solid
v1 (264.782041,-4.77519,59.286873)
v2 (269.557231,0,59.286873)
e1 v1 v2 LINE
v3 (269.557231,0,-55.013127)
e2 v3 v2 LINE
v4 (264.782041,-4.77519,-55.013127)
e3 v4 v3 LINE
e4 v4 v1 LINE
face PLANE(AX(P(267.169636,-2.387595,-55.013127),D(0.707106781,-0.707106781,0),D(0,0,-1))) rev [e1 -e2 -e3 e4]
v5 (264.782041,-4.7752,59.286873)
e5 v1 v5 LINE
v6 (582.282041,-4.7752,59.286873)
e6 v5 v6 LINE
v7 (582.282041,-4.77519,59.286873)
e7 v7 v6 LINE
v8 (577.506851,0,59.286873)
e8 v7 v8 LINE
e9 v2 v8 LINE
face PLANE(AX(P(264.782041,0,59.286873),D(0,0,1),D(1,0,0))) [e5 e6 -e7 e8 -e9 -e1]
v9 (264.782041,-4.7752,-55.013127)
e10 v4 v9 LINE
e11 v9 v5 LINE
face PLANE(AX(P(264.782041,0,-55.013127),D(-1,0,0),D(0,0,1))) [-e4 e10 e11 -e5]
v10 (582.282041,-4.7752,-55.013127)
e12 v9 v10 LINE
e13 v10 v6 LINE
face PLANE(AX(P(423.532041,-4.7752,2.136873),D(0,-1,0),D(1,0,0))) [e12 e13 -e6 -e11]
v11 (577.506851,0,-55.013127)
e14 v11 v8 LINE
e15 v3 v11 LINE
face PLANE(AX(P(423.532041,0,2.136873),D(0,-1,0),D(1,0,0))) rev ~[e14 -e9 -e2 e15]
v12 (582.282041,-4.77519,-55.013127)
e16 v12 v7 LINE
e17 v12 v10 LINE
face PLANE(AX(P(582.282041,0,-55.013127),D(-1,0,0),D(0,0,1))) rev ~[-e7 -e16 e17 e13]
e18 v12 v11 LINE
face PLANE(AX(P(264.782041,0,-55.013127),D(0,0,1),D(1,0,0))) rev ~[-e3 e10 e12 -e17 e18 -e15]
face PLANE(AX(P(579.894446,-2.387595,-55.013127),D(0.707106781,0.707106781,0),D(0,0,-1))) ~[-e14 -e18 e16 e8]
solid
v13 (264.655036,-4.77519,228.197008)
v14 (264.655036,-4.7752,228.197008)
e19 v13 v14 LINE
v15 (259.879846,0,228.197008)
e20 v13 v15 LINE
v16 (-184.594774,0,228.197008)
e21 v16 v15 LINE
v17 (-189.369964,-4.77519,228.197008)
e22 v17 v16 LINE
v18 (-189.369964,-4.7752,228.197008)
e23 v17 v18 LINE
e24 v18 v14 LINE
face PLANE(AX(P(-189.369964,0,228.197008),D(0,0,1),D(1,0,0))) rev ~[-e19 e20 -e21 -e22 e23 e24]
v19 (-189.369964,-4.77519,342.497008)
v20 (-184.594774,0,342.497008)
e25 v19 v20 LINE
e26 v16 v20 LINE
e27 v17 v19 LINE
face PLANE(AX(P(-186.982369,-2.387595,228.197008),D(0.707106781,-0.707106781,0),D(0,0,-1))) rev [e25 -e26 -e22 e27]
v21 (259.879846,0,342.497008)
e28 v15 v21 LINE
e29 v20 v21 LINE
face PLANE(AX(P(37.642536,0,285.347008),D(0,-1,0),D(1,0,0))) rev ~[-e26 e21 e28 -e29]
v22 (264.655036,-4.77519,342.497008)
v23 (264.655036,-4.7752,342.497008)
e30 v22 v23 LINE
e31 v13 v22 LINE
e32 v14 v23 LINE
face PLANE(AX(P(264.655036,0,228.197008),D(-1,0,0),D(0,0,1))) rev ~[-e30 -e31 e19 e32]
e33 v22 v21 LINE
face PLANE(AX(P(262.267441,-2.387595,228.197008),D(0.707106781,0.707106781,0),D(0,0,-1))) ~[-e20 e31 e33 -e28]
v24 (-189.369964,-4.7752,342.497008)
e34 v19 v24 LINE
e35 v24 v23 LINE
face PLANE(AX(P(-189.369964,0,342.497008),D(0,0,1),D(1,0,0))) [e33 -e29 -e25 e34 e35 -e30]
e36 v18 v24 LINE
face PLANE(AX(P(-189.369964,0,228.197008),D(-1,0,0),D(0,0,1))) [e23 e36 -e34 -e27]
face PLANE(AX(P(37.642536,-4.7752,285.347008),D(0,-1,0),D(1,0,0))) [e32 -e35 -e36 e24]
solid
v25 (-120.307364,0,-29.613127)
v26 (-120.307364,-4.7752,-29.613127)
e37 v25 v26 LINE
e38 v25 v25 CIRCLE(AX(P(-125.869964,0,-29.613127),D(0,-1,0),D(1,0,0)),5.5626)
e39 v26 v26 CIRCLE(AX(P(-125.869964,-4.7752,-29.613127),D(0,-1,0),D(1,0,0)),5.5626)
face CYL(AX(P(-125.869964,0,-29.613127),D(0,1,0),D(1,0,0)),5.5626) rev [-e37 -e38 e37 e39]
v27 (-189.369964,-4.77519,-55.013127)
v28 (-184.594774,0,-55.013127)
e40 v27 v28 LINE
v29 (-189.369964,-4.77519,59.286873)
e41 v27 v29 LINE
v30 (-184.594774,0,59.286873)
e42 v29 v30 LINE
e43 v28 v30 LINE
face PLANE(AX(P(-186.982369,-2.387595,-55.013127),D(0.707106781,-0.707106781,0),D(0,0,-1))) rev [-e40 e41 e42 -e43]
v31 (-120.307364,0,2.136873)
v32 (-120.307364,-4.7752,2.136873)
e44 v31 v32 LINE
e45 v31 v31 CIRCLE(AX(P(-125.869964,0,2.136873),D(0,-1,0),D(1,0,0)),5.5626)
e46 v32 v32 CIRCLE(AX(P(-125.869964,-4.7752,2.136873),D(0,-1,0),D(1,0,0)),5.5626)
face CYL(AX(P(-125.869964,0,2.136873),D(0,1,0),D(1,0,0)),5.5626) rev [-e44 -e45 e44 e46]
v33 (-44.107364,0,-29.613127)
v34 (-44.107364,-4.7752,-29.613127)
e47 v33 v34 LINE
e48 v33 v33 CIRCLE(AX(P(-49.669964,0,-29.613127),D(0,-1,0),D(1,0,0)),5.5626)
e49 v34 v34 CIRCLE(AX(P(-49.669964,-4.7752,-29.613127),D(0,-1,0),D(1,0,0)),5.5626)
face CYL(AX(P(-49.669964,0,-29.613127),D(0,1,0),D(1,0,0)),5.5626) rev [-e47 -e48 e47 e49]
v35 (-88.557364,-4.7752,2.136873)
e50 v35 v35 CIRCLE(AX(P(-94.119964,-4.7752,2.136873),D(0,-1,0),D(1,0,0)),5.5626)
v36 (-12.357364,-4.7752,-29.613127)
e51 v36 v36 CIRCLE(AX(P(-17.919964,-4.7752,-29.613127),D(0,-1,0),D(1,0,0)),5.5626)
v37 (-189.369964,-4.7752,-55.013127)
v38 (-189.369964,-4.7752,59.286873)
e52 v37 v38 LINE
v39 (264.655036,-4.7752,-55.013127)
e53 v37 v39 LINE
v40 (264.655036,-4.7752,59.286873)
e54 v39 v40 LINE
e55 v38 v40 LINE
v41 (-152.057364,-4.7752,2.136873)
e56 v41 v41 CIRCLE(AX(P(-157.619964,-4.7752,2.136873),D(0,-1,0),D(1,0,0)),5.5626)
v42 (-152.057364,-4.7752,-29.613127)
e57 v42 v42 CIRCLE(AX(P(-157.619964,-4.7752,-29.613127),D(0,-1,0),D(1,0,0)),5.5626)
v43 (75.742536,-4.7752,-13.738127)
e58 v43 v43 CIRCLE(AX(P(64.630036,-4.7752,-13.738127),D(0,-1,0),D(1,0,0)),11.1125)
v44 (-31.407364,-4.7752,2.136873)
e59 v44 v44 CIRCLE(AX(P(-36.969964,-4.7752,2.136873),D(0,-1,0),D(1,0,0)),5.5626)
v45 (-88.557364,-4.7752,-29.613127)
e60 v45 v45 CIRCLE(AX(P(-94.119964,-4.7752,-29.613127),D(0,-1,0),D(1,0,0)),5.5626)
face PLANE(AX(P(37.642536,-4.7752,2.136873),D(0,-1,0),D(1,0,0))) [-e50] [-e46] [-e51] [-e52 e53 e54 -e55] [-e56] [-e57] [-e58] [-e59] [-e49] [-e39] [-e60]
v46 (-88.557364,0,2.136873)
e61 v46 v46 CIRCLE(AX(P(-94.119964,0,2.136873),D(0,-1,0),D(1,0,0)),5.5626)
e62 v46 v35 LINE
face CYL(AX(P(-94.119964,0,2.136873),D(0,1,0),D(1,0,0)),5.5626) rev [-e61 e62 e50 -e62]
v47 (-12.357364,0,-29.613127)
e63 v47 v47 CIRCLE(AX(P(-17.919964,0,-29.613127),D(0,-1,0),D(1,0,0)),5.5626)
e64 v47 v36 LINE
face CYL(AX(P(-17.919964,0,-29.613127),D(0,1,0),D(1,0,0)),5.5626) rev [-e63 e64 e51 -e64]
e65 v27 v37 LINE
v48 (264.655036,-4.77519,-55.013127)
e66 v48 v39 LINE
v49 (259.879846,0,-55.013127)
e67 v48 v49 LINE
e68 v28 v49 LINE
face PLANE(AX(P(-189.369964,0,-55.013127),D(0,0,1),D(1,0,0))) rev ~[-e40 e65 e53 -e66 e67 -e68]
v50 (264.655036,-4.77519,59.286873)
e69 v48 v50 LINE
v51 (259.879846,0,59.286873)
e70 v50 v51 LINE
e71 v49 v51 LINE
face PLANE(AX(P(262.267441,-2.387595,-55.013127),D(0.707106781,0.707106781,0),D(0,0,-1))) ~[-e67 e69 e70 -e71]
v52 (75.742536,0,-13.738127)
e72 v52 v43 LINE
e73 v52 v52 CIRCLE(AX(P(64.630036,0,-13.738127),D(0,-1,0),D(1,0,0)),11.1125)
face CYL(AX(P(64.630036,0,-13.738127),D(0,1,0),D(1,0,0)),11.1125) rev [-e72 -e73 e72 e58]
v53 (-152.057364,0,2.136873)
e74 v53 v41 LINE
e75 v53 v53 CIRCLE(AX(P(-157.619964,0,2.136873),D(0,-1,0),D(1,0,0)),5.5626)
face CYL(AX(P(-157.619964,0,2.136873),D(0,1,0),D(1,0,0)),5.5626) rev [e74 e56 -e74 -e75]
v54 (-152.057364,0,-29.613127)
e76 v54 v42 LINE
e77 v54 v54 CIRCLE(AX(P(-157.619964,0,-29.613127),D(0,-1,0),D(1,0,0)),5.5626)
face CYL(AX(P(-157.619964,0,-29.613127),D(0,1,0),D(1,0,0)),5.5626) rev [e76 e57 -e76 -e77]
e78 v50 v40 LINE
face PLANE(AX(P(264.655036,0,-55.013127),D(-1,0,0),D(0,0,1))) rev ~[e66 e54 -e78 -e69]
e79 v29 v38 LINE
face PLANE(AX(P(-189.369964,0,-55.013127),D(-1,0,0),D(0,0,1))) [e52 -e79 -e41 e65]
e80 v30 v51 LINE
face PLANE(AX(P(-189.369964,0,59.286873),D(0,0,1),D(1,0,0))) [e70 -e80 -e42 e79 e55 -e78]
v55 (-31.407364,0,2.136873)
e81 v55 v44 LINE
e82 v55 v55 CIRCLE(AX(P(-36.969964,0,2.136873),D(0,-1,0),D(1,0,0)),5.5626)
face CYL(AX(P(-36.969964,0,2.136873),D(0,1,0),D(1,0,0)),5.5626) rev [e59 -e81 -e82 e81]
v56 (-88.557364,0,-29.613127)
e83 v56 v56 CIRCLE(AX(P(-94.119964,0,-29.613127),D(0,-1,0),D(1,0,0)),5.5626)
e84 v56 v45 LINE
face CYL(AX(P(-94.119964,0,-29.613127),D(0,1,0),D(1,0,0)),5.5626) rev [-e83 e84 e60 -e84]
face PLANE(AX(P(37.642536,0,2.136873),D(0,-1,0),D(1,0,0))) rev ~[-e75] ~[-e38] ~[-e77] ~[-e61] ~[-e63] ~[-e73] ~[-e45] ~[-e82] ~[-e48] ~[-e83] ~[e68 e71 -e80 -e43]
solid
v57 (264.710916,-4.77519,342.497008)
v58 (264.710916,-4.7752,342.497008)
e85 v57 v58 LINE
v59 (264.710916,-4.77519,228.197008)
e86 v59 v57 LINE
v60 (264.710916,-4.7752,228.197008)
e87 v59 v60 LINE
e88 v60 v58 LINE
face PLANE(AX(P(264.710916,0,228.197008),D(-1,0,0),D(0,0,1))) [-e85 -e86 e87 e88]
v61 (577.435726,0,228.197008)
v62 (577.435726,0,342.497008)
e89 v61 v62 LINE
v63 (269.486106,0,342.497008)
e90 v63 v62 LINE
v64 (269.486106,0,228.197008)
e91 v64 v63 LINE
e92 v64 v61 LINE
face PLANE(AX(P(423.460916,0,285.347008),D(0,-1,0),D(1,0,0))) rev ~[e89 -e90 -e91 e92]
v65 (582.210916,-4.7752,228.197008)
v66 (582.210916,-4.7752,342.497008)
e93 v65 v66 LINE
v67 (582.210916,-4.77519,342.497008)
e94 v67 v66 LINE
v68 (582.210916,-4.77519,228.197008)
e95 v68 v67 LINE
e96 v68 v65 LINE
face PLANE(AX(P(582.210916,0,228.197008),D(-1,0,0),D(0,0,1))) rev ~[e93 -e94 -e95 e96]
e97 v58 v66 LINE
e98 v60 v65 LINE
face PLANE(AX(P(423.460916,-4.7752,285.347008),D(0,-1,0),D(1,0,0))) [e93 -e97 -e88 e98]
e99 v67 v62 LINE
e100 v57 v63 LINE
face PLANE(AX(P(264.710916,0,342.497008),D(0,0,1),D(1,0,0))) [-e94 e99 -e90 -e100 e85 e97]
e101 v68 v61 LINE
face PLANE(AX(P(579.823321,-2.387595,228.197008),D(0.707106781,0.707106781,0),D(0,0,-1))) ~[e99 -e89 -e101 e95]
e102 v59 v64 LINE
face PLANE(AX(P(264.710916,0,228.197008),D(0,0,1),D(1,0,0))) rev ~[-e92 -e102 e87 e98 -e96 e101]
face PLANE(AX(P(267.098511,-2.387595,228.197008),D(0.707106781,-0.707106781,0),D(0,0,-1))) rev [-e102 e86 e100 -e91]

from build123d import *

# Parameters (mm, degrees)
F0_W      = 454.025
F0_H      = 114.3
F0_R      = 5.5626
F0_R_2    = 11.1125
F1_DEPTH  = 4.7752
F0_W_2    = 317.5
F2_SIZE   = 4.77519
F2_2_SIZE = 4.77519
F2_3_SIZE = 4.77519
F2_4_SIZE = 4.77519


# Not quite as in the source:
# - a fillet or chamfer is up to 0.001 mm smaller than in the source, because OpenCascade refuses the exact size
# - a feature names something its author has since deleted; it is built from what else it names


with BuildPart() as f1:
    # F0 (on Front) → F1 (new body)
    with BuildSketch(Plane.XZ):
        with Locations((37.6425363503, 2.1368730813)):
            Rectangle(F0_W, F0_H)
        with Locations((-157.6199636497, -29.6131269187)):
            Circle(F0_R, mode=Mode.SUBTRACT)
        with Locations((-125.8699636497, -29.6131269187)):
            Circle(F0_R, mode=Mode.SUBTRACT)
        with Locations((-94.1199636497, -29.6131269187)):
            Circle(F0_R, mode=Mode.SUBTRACT)
        with Locations((-49.6699636497, -29.6131269187)):
            Circle(F0_R, mode=Mode.SUBTRACT)
        with Locations((-17.9199636497, -29.6131269187)):
            Circle(F0_R, mode=Mode.SUBTRACT)
        with Locations((-157.6199636497, 2.1368730813)):
            Circle(F0_R, mode=Mode.SUBTRACT)
        with Locations((-125.8699636497, 2.1368730813)):
            Circle(F0_R, mode=Mode.SUBTRACT)
        with Locations((-94.1199636497, 2.1368730813)):
            Circle(F0_R, mode=Mode.SUBTRACT)
        with Locations((-36.9699636497, 2.1368730813)):
            Circle(F0_R, mode=Mode.SUBTRACT)
        with Locations((64.6300363503, -13.7381269187)):
            Circle(F0_R_2, mode=Mode.SUBTRACT)
    extrude(amount=F1_DEPTH)

    # F2#2 (size 4.7752 in the source; OpenCascade refuses exactly that, so slightly less here)
    f2_2_edges = [f1.edges().sort_by_distance(p)[0] for p in [
        (264.655036, 0, 2.136873),
        (-189.369964, 0, 2.136873),
    ]]
    chamfer(f2_2_edges, length=F2_2_SIZE)


with BuildPart() as f1b:
    # F0 (on Front) → F1, piece 2 (new body)
    with BuildSketch(Plane.XZ):
        with Locations((37.6425363503, 285.3470083714)):
            Rectangle(F0_W, F0_H)
    extrude(amount=F1_DEPTH)

    # F2 (size 4.7752 in the source; OpenCascade refuses exactly that, so slightly less here)
    f2_edges = [f1b.edges().sort_by_distance(p)[0] for p in [
        (264.655036, 0, 285.347008),
        (-189.369964, 0, 285.347008),
    ]]
    chamfer(f2_edges, length=F2_SIZE)


with BuildPart() as f1c:
    # F0 (on Front) → F1, piece 3 (new body)
    with BuildSketch(Plane.XZ):
        with Locations((423.5320413113, 2.1368730813)):
            Rectangle(F0_W_2, F0_H)
    extrude(amount=F1_DEPTH)

    # F2#3 (size 4.7752 in the source; OpenCascade refuses exactly that, so slightly less here)
    f2_3_edges = [f1c.edges().sort_by_distance(p)[0] for p in [
        (582.282041, 0, 2.136873),
        (264.782041, 0, 2.136873),
    ]]
    chamfer(f2_3_edges, length=F2_3_SIZE)


with BuildPart() as f1d:
    # F0 (on Front) → F1, piece 4 (new body)
    with BuildSketch(Plane.XZ):
        with Locations((423.4609160386, 285.3470083714)):
            Rectangle(F0_W_2, F0_H)
    extrude(amount=F1_DEPTH)

    # F2#4 (size 4.7752 in the source; OpenCascade refuses exactly that, so slightly less here)
    f2_4_edges = [f1d.edges().sort_by_distance(p)[0] for p in [
        (264.710916, 0, 285.347008),
        (582.210916, 0, 285.347008),
    ]]
    chamfer(f2_4_edges, length=F2_4_SIZE)


solid = Compound([f1.part, f1b.part, f1c.part, f1d.part])
